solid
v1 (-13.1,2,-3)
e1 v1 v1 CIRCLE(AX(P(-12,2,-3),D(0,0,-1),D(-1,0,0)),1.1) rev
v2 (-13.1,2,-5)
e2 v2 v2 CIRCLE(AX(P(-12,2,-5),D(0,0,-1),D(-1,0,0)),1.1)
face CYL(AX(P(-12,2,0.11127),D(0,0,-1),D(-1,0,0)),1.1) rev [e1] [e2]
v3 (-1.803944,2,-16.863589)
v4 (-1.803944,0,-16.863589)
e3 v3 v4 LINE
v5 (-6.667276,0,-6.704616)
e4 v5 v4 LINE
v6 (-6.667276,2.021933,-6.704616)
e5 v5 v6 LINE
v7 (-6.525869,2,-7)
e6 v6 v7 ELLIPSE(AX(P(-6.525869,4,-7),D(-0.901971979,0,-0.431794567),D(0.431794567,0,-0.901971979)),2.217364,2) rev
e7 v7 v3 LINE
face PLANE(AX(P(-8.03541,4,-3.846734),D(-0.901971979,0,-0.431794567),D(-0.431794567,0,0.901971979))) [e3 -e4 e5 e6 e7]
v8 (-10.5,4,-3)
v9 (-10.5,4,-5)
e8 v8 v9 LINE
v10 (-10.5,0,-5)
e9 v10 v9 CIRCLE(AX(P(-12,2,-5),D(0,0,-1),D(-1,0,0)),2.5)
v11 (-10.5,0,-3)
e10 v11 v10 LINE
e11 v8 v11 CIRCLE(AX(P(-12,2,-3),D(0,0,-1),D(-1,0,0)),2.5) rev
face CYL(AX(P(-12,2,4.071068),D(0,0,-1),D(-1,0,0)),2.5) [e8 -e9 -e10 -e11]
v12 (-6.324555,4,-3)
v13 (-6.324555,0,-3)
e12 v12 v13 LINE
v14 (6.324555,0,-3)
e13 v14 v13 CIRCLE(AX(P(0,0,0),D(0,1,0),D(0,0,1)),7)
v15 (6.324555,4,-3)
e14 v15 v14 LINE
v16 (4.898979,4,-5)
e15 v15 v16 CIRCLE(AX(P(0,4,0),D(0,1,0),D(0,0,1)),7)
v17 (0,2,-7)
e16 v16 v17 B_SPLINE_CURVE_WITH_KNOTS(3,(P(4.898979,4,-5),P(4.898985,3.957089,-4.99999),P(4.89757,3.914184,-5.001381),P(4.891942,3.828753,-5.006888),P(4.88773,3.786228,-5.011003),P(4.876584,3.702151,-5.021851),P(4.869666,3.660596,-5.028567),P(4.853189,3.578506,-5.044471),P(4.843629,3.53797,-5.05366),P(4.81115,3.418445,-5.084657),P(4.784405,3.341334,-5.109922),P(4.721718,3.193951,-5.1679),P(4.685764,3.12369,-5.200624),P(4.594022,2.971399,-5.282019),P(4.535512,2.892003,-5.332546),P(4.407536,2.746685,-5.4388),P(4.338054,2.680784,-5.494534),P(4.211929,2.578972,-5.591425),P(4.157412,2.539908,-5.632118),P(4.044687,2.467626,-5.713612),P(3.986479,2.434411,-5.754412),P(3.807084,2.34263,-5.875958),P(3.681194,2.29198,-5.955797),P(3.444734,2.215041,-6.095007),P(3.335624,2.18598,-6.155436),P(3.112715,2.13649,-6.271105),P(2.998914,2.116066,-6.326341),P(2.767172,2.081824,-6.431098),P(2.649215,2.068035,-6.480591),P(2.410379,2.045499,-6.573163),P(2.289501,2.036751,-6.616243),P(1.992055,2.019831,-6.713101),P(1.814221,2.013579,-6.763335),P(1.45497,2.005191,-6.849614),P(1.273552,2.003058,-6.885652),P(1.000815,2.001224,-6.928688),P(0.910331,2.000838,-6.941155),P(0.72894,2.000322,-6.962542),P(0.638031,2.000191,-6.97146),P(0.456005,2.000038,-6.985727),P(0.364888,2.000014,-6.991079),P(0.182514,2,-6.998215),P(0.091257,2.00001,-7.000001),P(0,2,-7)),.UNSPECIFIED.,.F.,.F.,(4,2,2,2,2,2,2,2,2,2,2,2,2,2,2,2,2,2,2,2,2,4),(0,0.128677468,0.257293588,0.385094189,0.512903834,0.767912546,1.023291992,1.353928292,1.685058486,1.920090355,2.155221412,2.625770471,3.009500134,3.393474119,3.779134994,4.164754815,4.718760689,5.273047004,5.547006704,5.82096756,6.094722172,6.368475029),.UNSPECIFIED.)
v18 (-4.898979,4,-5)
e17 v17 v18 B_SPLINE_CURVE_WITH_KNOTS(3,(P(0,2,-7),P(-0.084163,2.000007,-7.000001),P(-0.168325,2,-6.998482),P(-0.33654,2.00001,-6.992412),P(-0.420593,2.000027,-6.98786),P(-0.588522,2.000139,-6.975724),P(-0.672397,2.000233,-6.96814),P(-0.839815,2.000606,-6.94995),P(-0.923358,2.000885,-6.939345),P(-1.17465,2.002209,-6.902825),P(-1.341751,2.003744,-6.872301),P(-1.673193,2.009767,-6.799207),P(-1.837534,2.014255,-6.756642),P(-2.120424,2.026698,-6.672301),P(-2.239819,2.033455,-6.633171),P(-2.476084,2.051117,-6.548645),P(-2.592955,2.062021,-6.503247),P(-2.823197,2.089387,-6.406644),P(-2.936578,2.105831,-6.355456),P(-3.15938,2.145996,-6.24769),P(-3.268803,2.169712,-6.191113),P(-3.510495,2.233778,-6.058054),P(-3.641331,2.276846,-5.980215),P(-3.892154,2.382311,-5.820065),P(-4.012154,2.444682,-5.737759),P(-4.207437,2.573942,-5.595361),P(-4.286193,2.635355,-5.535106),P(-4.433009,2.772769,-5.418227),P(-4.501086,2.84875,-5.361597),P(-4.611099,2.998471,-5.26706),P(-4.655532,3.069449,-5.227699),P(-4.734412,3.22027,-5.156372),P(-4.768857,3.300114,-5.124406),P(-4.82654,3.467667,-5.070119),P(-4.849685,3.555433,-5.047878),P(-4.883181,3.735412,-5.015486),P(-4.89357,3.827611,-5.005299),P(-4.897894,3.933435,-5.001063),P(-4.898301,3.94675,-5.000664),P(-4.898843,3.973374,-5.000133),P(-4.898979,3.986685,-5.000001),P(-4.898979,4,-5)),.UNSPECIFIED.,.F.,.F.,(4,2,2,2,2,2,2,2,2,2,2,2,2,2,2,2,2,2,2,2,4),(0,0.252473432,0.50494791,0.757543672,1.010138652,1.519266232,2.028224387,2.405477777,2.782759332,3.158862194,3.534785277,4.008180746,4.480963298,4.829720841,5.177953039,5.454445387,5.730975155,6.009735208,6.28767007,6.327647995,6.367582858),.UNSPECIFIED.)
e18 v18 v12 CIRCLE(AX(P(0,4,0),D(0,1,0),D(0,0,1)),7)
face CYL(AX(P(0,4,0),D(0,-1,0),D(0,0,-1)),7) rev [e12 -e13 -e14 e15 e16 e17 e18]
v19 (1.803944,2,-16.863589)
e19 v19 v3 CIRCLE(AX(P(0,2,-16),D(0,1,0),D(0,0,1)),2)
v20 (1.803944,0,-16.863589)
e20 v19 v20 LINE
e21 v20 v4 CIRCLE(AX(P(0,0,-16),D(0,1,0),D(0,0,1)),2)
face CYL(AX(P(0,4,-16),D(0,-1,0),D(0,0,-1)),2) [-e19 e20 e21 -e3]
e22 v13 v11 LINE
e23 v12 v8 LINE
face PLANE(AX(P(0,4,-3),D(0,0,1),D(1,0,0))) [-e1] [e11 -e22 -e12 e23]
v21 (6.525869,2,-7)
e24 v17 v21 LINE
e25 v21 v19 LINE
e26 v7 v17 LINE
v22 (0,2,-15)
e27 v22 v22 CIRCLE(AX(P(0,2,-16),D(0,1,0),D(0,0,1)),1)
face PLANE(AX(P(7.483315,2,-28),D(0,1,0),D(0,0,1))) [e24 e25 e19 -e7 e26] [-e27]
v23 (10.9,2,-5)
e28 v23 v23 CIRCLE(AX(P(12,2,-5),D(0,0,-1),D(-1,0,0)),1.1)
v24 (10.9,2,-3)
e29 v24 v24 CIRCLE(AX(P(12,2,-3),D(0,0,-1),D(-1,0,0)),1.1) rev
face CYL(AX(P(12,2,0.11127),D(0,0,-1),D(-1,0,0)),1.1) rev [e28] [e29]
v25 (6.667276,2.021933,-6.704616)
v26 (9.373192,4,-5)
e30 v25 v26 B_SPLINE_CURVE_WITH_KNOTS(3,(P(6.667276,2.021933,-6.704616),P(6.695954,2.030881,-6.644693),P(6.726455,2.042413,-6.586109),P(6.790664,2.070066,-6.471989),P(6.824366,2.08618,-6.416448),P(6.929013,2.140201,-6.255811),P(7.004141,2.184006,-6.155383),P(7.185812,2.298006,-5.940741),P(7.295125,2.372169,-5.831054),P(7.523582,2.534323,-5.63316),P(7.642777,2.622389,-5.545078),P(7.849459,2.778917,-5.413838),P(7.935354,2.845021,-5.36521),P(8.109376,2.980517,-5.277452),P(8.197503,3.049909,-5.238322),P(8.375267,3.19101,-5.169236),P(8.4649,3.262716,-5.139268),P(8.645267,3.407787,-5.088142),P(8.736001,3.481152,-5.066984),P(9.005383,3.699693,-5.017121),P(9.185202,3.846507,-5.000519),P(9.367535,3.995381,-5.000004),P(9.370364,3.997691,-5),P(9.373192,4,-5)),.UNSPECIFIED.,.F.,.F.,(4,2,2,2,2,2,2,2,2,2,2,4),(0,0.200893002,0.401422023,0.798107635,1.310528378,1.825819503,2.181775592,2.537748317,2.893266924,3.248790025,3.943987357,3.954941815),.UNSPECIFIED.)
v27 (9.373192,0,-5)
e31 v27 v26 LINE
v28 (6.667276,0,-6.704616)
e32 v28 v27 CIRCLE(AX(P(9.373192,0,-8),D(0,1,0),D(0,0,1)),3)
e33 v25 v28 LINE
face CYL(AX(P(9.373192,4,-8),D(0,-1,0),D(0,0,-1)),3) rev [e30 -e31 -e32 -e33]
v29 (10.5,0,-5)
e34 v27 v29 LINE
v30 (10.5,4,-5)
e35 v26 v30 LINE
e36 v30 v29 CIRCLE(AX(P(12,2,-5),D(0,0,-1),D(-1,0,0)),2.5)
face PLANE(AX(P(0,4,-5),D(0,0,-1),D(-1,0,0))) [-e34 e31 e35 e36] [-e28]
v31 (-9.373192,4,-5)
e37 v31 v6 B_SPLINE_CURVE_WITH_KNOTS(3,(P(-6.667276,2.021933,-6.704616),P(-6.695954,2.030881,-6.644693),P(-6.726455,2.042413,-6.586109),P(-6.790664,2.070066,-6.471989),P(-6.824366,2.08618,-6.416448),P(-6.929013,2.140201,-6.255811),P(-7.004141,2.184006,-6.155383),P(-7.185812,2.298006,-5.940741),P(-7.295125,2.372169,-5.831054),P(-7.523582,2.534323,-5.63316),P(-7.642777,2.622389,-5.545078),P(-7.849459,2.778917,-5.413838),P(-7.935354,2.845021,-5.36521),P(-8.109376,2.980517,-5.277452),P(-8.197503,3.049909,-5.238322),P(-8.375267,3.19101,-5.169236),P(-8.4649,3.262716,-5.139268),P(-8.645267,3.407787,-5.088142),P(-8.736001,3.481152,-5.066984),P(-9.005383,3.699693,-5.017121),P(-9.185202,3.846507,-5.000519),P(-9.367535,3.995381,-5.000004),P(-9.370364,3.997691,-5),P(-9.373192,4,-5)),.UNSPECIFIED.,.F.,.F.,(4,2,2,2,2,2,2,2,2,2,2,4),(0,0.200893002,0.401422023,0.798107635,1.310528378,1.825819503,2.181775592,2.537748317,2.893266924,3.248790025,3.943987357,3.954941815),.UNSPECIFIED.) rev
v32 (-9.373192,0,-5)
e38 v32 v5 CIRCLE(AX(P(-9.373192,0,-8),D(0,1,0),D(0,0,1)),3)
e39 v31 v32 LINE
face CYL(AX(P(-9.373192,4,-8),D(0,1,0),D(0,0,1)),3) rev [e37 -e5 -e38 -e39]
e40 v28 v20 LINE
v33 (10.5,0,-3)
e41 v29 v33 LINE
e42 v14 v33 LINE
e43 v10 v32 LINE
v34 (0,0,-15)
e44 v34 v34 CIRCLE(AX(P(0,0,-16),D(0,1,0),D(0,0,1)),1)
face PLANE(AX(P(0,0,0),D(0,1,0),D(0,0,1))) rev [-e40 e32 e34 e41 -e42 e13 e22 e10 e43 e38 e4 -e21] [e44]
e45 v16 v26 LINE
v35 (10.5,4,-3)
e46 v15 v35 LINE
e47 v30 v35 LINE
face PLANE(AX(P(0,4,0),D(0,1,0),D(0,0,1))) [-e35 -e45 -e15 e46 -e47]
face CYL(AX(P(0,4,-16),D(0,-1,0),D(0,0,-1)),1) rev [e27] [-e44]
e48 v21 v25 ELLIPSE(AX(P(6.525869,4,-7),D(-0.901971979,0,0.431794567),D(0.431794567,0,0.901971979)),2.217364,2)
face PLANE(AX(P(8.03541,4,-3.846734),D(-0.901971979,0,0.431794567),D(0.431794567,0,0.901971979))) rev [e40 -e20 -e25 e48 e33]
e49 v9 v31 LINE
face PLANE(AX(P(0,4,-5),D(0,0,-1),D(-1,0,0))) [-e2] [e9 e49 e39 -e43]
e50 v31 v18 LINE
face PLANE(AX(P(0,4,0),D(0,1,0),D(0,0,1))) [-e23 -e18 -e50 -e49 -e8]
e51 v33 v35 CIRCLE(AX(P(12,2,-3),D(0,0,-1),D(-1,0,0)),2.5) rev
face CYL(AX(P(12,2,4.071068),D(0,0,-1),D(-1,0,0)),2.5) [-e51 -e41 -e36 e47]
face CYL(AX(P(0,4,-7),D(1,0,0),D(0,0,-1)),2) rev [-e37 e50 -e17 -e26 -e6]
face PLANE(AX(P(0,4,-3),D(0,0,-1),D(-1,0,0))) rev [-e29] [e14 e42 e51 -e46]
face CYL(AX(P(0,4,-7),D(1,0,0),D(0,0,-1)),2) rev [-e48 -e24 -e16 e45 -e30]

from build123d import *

# Parameters (mm, degrees)
SKETCH1_R           = 2
SKETCH1_R_2         = 1
BOSS_EXTRUDE1_DEPTH = 4
SKETCH2_R           = 1.1
CUT_EXTRUDE1_DEPTH  = 2
SKETCH3_W           = 14.966629548
SKETCH3_H           = 2
CUT_EXTRUDE2_DEPTH  = 23
FILLET1_R           = 3
FILLET2_R           = 2
FILLET3_R           = 2
SKETCH4_R           = 2.5
SKETCH4_R_2         = 1.1
BOSS_EXTRUDE2_DEPTH = 2


with BuildPart() as part:
    # Sketch1 → Boss-Extrude1 (new body)
    # profile 1 of 9: a face of its own
    with BuildSketch(Plane(origin=(0, 0, 0), x_dir=(1, 0, 0), z_dir=(0, 1, 0))):
        with BuildLine():
            Line((-14, 3), (-8.485281374, 3))
            ThreePointArc((-8.485281374, 3), (-8.04667731, 4.031250956), (-7.483314774, 5))
            Line((-7.483314774, 5), (-14, 5))
            Line((-14, 5), (-14, 3))
        make_face()
    # profile 2 of 9: a face of its own
    with BuildSketch(Plane(origin=(0, 0, 0), x_dir=(1, 0, 0), z_dir=(0, 1, 0))):
        with BuildLine():
            ThreePointArc((-7.483314774, 5), (-8.04667731, 4.031250956), (-8.485281374, 3))
            Line((-8.485281374, 3), (-6.32455532, 3))
            ThreePointArc((-6.32455532, 3), (-5.700169593, 4.063012013), (-4.898979486, 5))
            Line((-4.898979486, 5), (-7.483314774, 5))
        make_face()
    # profile 3 of 9: a face of its own
    with BuildSketch(Plane(origin=(0, 0, 0), x_dir=(1, 0, 0), z_dir=(0, 1, 0))):
        with BuildLine():
            ThreePointArc((4.898979486, 5), (5.700169593, 4.063012013), (6.32455532, 3))
            Line((6.32455532, 3), (8.485281374, 3))
            ThreePointArc((8.485281374, 3), (8.04667731, 4.031250956), (7.483314774, 5))
            Line((7.483314774, 5), (4.898979486, 5))
        make_face()
    # profile 4 of 9: a face of its own
    with BuildSketch(Plane(origin=(0, 0, 0), x_dir=(1, 0, 0), z_dir=(0, 1, 0))):
        with BuildLine():
            ThreePointArc((7.483314774, 5), (0, 9), (-7.483314774, 5))
            Line((-7.483314774, 5), (-4.898979486, 5))
            ThreePointArc((-4.898979486, 5), (0, 7), (4.898979486, 5))
            Line((4.898979486, 5), (7.483314774, 5))
        make_face()
    # profile 5 of 9: a face of its own
    with BuildSketch(Plane(origin=(0, 0, 0), x_dir=(1, 0, 0), z_dir=(0, 1, 0))):
        with BuildLine():
            Line((-1.803943959, 16.863589134), (-7.483314774, 5))
            ThreePointArc((-7.483314774, 5), (0, 9), (7.483314774, 5))
            Line((7.483314774, 5), (1.803943959, 16.863589134))
            ThreePointArc((1.803943959, 16.863589134), (1.950370211, 16.44278216), (2, 16))
            ThreePointArc((2, 16), (-0.44278216, 14.049629789), (-1.803943959, 16.863589134))
        make_face()
    # profile 6 of 9: a face of its own
    with BuildSketch(Plane(origin=(0, 0, 0), x_dir=(1, 0, 0), z_dir=(0, 1, 0))):
        with BuildLine():
            Line((14, 5), (7.483314774, 5))
            ThreePointArc((7.483314774, 5), (8.04667731, 4.031250956), (8.485281374, 3))
            Line((8.485281374, 3), (14, 3))
            Line((14, 3), (14, 5))
        make_face()
    # profile 7 of 9: a face of its own
    with BuildSketch(Plane(origin=(0, 0, 0), x_dir=(1, 0, 0), z_dir=(0, 1, 0))):
        with BuildLine():
            ThreePointArc((-7.483314774, 5), (-8.04667731, 4.031250956), (-8.485281374, 3))
            Line((-8.485281374, 3), (-6.32455532, 3))
            ThreePointArc((-6.32455532, 3), (-5.700169593, 4.063012013), (-4.898979486, 5))
            Line((-4.898979486, 5), (-7.483314774, 5))
        make_face()
    # profile 8 of 9: a face of its own
    with BuildSketch(Plane(origin=(0, 0, 0), x_dir=(1, 0, 0), z_dir=(0, 1, 0))):
        with BuildLine():
            ThreePointArc((4.898979486, 5), (5.700169593, 4.063012013), (6.32455532, 3))
            Line((6.32455532, 3), (8.485281374, 3))
            ThreePointArc((8.485281374, 3), (8.04667731, 4.031250956), (7.483314774, 5))
            Line((7.483314774, 5), (4.898979486, 5))
        make_face()
    # profile 9 of 9: a face of its own
    with BuildSketch(Plane(origin=(0, 0, 0), x_dir=(1, 0, 0), z_dir=(0, 1, 0))):
        with Locations((0, 16)):
            Circle(SKETCH1_R)
        with Locations(Location((0, 16, 0), (0, 0, 270))):
            Circle(SKETCH1_R_2, mode=Mode.SUBTRACT)
    extrude(amount=BOSS_EXTRUDE1_DEPTH)

    # Sketch2 → Cut-Extrude1 (cut)
    with BuildSketch(Plane(origin=(0, 0, -5), x_dir=(-1, 0, 0), z_dir=(0, 0, -1))):
        with Locations((-12, 2)):
            Circle(SKETCH2_R)
        with Locations((12, 2)):
            Circle(SKETCH2_R)
    extrude(amount=-CUT_EXTRUDE1_DEPTH, mode=Mode.SUBTRACT)

    # Sketch3 → Cut-Extrude2 (cut)
    with BuildSketch(Plane(origin=(0, 0, -5), x_dir=(-1, 0, 0), z_dir=(0, 0, -1))):
        with Locations((0, 3)):
            Rectangle(SKETCH3_W, SKETCH3_H)
    extrude(amount=CUT_EXTRUDE2_DEPTH, mode=Mode.SUBTRACT)

    # Fillet1
    fillet1_edges = [part.edges().sort_by_distance(p)[0] for p in [
        (-7.483314774, 1, -5),
        (7.483314774, 1, -5),
    ]]
    fillet(fillet1_edges, radius=FILLET1_R)

    # Fillet2
    fillet2_edges = [part.edges().sort_by_distance(p)[0] for p in [
        (-14, 0, -4),
        (14, 0, -4),
        (14, 4, -4),
        (-14, 4, -4),
    ]]
    fillet(fillet2_edges, radius=FILLET2_R - 0.0001)  # a hair under: the kernel refuses the full size

    # Fillet3
    fillet3_edges = [part.edges().sort_by_distance(p)[0] for p in [
        (7.13608574, 2, -5),
        (-7.13608574, 2, -5),
    ]]
    fillet(fillet3_edges, radius=FILLET3_R - 0.0001)  # a hair under: the kernel refuses the full size

    # Sketch4 → Boss-Extrude2 (add)
    # profile 1 of 2: a face of its own
    with BuildSketch(Plane(origin=(0, 0, -5), x_dir=(-1, 0, 0), z_dir=(0, 0, -1))):
        with Locations((12, 2)):
            Circle(SKETCH4_R)
        with Locations((12, 2)):
            Circle(SKETCH4_R_2, mode=Mode.SUBTRACT)
    # profile 2 of 2: a face of its own
    with BuildSketch(Plane(origin=(0, 0, -5), x_dir=(-1, 0, 0), z_dir=(0, 0, -1))):
        with Locations((-12, 2)):
            Circle(SKETCH4_R)
        with Locations((-12, 2)):
            Circle(SKETCH4_R_2, mode=Mode.SUBTRACT)
    extrude(amount=-BOSS_EXTRUDE2_DEPTH)


solid = part.part
